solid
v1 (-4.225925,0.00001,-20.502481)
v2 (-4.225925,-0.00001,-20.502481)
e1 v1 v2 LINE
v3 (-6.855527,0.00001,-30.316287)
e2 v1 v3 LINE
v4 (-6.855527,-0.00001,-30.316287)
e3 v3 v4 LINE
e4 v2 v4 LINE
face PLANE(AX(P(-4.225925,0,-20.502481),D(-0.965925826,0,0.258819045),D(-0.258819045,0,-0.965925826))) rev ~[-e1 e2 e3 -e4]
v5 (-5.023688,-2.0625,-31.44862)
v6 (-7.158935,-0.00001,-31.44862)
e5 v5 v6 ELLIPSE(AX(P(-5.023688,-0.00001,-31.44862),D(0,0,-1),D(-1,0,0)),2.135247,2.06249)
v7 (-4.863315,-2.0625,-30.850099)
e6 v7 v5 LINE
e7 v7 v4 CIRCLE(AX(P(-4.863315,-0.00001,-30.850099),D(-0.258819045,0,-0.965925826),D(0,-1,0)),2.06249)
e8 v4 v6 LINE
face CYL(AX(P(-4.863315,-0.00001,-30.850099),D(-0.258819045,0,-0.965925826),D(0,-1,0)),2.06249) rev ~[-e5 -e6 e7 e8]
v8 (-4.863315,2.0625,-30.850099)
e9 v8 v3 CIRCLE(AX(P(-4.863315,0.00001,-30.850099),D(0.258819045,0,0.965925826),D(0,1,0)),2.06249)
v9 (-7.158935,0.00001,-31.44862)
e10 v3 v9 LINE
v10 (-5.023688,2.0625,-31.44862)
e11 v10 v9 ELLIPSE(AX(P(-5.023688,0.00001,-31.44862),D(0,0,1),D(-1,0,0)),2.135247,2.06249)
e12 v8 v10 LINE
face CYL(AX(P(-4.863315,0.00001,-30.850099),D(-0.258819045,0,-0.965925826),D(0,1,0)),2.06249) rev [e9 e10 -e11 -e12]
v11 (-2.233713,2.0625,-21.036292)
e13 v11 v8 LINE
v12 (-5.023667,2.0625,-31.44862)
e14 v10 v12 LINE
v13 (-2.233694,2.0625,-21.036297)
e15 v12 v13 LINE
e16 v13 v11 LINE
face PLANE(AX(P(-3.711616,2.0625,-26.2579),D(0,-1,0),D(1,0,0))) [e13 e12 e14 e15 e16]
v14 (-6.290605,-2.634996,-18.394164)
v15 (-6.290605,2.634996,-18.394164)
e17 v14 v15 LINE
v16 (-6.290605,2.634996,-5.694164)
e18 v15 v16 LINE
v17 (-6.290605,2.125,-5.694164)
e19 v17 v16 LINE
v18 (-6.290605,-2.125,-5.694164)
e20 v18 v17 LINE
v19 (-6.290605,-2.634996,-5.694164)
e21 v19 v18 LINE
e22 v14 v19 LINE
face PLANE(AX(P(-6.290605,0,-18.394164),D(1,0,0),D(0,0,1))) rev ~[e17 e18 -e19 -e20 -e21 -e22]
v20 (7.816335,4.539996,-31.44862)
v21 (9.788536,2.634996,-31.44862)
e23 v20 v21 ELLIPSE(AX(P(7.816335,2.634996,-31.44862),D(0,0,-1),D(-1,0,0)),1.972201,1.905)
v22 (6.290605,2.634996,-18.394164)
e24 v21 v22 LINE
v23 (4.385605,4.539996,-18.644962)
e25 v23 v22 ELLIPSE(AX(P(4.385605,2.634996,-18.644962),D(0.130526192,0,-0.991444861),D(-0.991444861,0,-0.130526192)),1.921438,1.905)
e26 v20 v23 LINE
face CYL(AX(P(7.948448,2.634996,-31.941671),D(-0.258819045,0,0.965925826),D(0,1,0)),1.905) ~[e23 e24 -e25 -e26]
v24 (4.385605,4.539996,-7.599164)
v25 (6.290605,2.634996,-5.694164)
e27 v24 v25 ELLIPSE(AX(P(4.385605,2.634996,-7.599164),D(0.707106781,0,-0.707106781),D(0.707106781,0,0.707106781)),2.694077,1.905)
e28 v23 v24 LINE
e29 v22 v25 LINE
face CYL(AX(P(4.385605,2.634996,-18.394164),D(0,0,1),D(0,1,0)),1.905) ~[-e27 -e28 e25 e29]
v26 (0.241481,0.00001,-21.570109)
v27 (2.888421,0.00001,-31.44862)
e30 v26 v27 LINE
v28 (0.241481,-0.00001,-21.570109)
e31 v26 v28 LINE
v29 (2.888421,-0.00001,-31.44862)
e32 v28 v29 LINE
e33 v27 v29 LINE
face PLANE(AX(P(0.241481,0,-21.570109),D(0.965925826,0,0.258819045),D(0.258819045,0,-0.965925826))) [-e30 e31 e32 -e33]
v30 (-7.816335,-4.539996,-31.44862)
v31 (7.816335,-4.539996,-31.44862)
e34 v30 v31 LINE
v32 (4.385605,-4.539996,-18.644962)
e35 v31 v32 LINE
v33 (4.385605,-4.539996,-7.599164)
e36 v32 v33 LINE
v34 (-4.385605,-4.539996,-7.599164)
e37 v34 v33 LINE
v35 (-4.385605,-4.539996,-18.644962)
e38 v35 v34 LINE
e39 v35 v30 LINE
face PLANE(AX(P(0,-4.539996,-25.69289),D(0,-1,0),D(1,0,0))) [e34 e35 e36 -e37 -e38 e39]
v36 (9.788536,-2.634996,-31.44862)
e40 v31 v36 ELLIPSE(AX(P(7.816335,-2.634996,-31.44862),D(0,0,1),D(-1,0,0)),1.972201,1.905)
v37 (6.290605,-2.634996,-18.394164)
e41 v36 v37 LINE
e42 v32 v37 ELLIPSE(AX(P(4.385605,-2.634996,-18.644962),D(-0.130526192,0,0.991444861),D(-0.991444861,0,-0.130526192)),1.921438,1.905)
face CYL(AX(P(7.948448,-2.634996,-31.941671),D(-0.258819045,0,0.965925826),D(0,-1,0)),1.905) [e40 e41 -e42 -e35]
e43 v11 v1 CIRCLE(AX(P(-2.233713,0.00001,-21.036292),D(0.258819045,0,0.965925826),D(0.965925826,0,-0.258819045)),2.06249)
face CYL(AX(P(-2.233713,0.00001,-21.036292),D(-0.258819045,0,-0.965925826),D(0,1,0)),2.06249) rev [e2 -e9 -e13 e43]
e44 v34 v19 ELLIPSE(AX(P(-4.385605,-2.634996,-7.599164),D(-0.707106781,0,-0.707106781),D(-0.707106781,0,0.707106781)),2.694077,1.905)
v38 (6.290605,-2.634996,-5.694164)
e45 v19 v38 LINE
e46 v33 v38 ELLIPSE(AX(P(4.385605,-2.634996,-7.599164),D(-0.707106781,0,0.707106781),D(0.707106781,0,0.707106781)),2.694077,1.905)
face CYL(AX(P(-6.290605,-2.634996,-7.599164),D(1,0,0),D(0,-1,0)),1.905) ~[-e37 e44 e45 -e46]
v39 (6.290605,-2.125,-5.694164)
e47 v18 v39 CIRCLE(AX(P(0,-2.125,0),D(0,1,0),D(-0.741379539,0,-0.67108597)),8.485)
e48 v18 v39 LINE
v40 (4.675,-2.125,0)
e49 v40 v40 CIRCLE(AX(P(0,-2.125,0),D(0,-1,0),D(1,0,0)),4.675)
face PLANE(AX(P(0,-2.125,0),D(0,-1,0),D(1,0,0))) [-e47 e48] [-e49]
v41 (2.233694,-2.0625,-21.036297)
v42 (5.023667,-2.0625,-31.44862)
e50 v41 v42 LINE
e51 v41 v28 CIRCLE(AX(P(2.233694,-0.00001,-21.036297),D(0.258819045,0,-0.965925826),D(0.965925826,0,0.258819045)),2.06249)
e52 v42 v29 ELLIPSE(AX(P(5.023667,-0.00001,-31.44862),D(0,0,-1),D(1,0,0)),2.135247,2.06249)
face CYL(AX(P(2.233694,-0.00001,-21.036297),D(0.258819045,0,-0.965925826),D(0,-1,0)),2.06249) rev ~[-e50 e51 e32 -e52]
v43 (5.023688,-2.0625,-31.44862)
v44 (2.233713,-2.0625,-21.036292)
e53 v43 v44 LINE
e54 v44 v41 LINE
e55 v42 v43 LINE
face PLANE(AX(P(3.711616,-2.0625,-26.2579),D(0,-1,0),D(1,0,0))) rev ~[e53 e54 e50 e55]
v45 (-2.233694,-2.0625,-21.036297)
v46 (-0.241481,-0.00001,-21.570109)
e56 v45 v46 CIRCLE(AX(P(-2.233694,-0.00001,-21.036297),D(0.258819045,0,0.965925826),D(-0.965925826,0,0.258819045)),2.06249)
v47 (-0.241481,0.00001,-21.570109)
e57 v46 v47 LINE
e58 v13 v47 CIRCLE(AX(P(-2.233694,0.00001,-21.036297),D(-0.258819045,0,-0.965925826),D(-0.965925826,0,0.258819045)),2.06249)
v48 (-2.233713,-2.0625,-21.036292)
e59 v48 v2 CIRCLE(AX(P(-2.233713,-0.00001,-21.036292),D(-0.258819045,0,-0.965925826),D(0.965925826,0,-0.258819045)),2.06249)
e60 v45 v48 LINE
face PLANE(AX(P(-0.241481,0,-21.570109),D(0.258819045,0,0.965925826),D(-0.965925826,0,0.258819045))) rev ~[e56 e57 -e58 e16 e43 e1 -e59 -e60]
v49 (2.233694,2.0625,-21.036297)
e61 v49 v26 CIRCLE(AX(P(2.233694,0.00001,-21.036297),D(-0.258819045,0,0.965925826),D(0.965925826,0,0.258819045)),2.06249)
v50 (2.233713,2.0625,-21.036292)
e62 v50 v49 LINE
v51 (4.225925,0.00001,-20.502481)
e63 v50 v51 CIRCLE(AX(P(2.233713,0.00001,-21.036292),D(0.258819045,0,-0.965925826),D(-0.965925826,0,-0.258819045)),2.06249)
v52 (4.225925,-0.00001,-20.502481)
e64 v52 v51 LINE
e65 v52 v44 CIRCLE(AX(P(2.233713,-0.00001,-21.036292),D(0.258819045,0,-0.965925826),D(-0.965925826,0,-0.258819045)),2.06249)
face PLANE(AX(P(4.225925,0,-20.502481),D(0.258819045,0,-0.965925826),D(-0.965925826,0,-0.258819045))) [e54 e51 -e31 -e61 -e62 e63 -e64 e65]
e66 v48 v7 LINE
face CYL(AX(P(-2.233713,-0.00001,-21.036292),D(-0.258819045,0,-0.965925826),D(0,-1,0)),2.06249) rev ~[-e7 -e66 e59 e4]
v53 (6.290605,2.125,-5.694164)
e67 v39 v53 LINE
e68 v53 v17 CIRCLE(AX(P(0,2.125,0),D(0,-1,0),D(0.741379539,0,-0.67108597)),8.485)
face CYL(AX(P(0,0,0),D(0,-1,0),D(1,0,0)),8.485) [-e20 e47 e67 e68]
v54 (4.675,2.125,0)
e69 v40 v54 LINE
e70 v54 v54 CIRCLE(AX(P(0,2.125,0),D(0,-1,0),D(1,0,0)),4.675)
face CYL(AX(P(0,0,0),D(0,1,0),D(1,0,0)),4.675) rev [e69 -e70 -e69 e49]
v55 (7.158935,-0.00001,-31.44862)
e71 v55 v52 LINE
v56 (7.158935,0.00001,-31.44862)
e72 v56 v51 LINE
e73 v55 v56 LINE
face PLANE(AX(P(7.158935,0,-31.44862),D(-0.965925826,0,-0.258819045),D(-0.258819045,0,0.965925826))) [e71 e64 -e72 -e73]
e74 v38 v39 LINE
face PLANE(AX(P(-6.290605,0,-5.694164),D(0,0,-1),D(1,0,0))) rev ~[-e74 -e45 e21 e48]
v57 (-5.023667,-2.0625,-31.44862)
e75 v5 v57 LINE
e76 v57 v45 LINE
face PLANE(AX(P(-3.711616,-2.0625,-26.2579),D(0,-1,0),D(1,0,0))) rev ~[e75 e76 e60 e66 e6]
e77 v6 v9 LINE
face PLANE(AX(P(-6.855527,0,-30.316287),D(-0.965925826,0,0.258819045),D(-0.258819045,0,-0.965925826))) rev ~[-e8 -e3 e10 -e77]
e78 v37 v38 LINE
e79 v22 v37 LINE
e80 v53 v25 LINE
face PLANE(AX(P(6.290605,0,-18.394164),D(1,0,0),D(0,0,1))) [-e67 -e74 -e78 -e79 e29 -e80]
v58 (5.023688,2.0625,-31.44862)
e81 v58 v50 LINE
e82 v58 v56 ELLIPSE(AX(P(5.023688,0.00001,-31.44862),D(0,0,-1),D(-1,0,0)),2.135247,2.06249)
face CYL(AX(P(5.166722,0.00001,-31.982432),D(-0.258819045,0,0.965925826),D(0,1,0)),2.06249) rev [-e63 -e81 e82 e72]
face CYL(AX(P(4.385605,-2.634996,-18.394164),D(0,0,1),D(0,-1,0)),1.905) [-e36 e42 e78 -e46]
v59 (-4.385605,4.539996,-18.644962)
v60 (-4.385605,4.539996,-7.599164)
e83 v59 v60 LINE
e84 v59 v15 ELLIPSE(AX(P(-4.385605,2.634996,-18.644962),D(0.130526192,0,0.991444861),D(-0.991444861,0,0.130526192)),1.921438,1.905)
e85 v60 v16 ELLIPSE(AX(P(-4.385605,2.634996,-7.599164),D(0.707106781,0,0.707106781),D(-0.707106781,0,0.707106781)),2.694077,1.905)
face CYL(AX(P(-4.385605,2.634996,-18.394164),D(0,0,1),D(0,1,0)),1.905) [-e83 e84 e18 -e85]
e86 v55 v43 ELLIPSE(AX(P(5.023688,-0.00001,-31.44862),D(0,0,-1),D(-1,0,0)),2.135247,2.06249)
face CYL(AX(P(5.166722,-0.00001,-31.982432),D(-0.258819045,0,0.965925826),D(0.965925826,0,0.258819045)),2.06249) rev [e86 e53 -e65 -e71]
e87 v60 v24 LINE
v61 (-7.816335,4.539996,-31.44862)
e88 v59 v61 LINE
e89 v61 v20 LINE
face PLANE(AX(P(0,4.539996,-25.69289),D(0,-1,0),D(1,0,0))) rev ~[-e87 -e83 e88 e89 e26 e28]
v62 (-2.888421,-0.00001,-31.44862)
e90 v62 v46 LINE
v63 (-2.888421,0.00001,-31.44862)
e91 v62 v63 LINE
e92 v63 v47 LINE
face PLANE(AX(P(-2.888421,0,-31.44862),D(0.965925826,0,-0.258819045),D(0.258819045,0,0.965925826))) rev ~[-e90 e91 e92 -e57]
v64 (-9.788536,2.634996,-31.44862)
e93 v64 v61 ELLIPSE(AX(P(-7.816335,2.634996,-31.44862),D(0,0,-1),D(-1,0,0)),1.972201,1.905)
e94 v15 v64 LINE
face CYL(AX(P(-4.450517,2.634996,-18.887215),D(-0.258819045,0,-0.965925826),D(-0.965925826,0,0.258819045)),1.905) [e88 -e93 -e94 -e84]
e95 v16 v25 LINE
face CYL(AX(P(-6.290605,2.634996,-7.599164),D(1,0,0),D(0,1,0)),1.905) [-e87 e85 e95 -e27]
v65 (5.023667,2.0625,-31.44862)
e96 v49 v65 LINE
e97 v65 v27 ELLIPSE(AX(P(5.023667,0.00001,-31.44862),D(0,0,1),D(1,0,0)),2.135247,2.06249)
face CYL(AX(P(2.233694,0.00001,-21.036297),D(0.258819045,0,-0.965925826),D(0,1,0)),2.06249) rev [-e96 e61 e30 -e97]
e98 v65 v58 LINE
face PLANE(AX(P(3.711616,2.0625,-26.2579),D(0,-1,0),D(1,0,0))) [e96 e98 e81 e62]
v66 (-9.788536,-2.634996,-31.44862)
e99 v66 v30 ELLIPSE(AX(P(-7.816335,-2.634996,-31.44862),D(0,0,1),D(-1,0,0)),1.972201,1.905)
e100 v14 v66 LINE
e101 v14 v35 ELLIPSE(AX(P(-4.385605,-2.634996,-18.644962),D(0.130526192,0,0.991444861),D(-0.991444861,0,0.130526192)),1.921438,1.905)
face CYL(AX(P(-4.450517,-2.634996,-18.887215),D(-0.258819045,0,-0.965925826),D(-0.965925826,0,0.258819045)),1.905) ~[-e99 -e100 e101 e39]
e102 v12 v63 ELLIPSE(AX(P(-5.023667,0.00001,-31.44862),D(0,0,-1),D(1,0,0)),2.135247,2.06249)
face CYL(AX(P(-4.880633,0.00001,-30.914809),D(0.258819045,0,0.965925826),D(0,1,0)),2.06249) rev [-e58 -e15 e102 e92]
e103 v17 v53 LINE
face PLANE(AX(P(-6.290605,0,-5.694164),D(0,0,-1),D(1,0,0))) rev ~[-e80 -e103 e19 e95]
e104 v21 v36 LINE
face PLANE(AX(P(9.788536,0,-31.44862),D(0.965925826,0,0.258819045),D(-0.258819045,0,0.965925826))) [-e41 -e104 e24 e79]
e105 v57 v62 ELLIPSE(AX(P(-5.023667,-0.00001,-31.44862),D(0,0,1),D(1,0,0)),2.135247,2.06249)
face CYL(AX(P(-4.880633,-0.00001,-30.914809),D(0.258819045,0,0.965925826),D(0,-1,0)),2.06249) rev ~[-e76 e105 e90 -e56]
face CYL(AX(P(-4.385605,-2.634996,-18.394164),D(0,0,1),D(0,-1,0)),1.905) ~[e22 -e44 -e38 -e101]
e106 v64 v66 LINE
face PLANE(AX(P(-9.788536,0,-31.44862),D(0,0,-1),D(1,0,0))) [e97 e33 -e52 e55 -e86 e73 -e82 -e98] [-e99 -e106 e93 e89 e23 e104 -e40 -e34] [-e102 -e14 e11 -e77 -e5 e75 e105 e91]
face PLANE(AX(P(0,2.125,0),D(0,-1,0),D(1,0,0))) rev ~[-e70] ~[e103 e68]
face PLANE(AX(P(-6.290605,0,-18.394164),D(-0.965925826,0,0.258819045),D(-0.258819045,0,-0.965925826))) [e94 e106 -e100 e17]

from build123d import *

# Parameters (mm, degrees)
F0_R     = 8.485
F0_R_2   = 4.675
F1_DEPTH = 2.125
F2_W     = 12.5812107759
F2_H     = 12.7
F3_DEPTH = 4.539996
F5_DEPTH = 2.0625
F6_R     = 2.06249
F7_R     = 1.905


# Not quite as in the source:
# - a fillet or chamfer is up to 0.001 mm smaller than in the source, because OpenCascade refuses the exact size


with BuildPart() as f1:
    # F0 (on Front) → F1 (new body, symmetric)
    with BuildSketch(Plane.XZ):
        Circle(F0_R)
        Circle(F0_R_2, mode=Mode.SUBTRACT)
    extrude(amount=F1_DEPTH, both=True)

    # F2 (on Front) → F3 (join, symmetric)
    with BuildSketch(Plane.XZ):
        Polygon((-6.2906053879, -18.3941644561), (-9.7885362858, -31.4486202883), (9.7885362858, -31.4486202883), (6.2906053879, -18.3941644561), align=None)
        with Locations((0, -12.0441644561)):
            Rectangle(F2_W, F2_H)
    extrude(amount=F3_DEPTH, both=True)

    # F4 (on Front) → F5 (cut, symmetric)
    with BuildSketch(Plane.XZ):
        Polygon((4.22592549, -20.5024805709), (0.2414814566, -21.5701091319), (2.8884205433, -31.4486202883), (7.1589347875, -31.4486202883), align=None)
        Polygon((-0.2414814566, -21.5701091319), (-4.22592549, -20.5024805709), (-6.8555269883, -30.3162869659), (-7.1589347875, -31.4486202883), (-2.8884205433, -31.4486202883), align=None)
    extrude(amount=F5_DEPTH, both=True, mode=Mode.SUBTRACT)

    # F6 (radius 2.0625 in the source; OpenCascade refuses exactly that, so slightly less here)
    f6_edges = [f1.edges().sort_by_distance(p)[0] for p in [
        (-5.69243, -2.0625, -25.97555),
        (1.564951, -2.0625, -26.509365),
        (5.69243, -2.0625, -25.97555),
        (-1.564951, -2.0625, -26.509365),
        (5.69243, 2.0625, -25.97555),
        (-1.564951, 2.0625, -26.509365),
        (-5.69243, 2.0625, -25.97555),
        (1.564951, 2.0625, -26.509365),
    ]]
    fillet(f6_edges, radius=F6_R)

    # F7
    f7_edges = [f1.edges().sort_by_distance(p)[0] for p in [
        (-8.039571, -4.539996, -24.921392),
        (-6.290605, -4.539996, -12.044164),
        (-6.290605, 4.539996, -12.044164),
        (-8.039571, 4.539996, -24.921392),
        (8.039571, -4.539996, -24.921392),
        (6.290605, -4.539996, -12.044164),
        (8.039571, 4.539996, -24.921392),
        (6.290605, 4.539996, -12.044164),
        (0, 4.539996, -5.694164),
        (0, -4.539996, -5.694164),
    ]]
    fillet(f7_edges, radius=F7_R)


solid = f1.part
